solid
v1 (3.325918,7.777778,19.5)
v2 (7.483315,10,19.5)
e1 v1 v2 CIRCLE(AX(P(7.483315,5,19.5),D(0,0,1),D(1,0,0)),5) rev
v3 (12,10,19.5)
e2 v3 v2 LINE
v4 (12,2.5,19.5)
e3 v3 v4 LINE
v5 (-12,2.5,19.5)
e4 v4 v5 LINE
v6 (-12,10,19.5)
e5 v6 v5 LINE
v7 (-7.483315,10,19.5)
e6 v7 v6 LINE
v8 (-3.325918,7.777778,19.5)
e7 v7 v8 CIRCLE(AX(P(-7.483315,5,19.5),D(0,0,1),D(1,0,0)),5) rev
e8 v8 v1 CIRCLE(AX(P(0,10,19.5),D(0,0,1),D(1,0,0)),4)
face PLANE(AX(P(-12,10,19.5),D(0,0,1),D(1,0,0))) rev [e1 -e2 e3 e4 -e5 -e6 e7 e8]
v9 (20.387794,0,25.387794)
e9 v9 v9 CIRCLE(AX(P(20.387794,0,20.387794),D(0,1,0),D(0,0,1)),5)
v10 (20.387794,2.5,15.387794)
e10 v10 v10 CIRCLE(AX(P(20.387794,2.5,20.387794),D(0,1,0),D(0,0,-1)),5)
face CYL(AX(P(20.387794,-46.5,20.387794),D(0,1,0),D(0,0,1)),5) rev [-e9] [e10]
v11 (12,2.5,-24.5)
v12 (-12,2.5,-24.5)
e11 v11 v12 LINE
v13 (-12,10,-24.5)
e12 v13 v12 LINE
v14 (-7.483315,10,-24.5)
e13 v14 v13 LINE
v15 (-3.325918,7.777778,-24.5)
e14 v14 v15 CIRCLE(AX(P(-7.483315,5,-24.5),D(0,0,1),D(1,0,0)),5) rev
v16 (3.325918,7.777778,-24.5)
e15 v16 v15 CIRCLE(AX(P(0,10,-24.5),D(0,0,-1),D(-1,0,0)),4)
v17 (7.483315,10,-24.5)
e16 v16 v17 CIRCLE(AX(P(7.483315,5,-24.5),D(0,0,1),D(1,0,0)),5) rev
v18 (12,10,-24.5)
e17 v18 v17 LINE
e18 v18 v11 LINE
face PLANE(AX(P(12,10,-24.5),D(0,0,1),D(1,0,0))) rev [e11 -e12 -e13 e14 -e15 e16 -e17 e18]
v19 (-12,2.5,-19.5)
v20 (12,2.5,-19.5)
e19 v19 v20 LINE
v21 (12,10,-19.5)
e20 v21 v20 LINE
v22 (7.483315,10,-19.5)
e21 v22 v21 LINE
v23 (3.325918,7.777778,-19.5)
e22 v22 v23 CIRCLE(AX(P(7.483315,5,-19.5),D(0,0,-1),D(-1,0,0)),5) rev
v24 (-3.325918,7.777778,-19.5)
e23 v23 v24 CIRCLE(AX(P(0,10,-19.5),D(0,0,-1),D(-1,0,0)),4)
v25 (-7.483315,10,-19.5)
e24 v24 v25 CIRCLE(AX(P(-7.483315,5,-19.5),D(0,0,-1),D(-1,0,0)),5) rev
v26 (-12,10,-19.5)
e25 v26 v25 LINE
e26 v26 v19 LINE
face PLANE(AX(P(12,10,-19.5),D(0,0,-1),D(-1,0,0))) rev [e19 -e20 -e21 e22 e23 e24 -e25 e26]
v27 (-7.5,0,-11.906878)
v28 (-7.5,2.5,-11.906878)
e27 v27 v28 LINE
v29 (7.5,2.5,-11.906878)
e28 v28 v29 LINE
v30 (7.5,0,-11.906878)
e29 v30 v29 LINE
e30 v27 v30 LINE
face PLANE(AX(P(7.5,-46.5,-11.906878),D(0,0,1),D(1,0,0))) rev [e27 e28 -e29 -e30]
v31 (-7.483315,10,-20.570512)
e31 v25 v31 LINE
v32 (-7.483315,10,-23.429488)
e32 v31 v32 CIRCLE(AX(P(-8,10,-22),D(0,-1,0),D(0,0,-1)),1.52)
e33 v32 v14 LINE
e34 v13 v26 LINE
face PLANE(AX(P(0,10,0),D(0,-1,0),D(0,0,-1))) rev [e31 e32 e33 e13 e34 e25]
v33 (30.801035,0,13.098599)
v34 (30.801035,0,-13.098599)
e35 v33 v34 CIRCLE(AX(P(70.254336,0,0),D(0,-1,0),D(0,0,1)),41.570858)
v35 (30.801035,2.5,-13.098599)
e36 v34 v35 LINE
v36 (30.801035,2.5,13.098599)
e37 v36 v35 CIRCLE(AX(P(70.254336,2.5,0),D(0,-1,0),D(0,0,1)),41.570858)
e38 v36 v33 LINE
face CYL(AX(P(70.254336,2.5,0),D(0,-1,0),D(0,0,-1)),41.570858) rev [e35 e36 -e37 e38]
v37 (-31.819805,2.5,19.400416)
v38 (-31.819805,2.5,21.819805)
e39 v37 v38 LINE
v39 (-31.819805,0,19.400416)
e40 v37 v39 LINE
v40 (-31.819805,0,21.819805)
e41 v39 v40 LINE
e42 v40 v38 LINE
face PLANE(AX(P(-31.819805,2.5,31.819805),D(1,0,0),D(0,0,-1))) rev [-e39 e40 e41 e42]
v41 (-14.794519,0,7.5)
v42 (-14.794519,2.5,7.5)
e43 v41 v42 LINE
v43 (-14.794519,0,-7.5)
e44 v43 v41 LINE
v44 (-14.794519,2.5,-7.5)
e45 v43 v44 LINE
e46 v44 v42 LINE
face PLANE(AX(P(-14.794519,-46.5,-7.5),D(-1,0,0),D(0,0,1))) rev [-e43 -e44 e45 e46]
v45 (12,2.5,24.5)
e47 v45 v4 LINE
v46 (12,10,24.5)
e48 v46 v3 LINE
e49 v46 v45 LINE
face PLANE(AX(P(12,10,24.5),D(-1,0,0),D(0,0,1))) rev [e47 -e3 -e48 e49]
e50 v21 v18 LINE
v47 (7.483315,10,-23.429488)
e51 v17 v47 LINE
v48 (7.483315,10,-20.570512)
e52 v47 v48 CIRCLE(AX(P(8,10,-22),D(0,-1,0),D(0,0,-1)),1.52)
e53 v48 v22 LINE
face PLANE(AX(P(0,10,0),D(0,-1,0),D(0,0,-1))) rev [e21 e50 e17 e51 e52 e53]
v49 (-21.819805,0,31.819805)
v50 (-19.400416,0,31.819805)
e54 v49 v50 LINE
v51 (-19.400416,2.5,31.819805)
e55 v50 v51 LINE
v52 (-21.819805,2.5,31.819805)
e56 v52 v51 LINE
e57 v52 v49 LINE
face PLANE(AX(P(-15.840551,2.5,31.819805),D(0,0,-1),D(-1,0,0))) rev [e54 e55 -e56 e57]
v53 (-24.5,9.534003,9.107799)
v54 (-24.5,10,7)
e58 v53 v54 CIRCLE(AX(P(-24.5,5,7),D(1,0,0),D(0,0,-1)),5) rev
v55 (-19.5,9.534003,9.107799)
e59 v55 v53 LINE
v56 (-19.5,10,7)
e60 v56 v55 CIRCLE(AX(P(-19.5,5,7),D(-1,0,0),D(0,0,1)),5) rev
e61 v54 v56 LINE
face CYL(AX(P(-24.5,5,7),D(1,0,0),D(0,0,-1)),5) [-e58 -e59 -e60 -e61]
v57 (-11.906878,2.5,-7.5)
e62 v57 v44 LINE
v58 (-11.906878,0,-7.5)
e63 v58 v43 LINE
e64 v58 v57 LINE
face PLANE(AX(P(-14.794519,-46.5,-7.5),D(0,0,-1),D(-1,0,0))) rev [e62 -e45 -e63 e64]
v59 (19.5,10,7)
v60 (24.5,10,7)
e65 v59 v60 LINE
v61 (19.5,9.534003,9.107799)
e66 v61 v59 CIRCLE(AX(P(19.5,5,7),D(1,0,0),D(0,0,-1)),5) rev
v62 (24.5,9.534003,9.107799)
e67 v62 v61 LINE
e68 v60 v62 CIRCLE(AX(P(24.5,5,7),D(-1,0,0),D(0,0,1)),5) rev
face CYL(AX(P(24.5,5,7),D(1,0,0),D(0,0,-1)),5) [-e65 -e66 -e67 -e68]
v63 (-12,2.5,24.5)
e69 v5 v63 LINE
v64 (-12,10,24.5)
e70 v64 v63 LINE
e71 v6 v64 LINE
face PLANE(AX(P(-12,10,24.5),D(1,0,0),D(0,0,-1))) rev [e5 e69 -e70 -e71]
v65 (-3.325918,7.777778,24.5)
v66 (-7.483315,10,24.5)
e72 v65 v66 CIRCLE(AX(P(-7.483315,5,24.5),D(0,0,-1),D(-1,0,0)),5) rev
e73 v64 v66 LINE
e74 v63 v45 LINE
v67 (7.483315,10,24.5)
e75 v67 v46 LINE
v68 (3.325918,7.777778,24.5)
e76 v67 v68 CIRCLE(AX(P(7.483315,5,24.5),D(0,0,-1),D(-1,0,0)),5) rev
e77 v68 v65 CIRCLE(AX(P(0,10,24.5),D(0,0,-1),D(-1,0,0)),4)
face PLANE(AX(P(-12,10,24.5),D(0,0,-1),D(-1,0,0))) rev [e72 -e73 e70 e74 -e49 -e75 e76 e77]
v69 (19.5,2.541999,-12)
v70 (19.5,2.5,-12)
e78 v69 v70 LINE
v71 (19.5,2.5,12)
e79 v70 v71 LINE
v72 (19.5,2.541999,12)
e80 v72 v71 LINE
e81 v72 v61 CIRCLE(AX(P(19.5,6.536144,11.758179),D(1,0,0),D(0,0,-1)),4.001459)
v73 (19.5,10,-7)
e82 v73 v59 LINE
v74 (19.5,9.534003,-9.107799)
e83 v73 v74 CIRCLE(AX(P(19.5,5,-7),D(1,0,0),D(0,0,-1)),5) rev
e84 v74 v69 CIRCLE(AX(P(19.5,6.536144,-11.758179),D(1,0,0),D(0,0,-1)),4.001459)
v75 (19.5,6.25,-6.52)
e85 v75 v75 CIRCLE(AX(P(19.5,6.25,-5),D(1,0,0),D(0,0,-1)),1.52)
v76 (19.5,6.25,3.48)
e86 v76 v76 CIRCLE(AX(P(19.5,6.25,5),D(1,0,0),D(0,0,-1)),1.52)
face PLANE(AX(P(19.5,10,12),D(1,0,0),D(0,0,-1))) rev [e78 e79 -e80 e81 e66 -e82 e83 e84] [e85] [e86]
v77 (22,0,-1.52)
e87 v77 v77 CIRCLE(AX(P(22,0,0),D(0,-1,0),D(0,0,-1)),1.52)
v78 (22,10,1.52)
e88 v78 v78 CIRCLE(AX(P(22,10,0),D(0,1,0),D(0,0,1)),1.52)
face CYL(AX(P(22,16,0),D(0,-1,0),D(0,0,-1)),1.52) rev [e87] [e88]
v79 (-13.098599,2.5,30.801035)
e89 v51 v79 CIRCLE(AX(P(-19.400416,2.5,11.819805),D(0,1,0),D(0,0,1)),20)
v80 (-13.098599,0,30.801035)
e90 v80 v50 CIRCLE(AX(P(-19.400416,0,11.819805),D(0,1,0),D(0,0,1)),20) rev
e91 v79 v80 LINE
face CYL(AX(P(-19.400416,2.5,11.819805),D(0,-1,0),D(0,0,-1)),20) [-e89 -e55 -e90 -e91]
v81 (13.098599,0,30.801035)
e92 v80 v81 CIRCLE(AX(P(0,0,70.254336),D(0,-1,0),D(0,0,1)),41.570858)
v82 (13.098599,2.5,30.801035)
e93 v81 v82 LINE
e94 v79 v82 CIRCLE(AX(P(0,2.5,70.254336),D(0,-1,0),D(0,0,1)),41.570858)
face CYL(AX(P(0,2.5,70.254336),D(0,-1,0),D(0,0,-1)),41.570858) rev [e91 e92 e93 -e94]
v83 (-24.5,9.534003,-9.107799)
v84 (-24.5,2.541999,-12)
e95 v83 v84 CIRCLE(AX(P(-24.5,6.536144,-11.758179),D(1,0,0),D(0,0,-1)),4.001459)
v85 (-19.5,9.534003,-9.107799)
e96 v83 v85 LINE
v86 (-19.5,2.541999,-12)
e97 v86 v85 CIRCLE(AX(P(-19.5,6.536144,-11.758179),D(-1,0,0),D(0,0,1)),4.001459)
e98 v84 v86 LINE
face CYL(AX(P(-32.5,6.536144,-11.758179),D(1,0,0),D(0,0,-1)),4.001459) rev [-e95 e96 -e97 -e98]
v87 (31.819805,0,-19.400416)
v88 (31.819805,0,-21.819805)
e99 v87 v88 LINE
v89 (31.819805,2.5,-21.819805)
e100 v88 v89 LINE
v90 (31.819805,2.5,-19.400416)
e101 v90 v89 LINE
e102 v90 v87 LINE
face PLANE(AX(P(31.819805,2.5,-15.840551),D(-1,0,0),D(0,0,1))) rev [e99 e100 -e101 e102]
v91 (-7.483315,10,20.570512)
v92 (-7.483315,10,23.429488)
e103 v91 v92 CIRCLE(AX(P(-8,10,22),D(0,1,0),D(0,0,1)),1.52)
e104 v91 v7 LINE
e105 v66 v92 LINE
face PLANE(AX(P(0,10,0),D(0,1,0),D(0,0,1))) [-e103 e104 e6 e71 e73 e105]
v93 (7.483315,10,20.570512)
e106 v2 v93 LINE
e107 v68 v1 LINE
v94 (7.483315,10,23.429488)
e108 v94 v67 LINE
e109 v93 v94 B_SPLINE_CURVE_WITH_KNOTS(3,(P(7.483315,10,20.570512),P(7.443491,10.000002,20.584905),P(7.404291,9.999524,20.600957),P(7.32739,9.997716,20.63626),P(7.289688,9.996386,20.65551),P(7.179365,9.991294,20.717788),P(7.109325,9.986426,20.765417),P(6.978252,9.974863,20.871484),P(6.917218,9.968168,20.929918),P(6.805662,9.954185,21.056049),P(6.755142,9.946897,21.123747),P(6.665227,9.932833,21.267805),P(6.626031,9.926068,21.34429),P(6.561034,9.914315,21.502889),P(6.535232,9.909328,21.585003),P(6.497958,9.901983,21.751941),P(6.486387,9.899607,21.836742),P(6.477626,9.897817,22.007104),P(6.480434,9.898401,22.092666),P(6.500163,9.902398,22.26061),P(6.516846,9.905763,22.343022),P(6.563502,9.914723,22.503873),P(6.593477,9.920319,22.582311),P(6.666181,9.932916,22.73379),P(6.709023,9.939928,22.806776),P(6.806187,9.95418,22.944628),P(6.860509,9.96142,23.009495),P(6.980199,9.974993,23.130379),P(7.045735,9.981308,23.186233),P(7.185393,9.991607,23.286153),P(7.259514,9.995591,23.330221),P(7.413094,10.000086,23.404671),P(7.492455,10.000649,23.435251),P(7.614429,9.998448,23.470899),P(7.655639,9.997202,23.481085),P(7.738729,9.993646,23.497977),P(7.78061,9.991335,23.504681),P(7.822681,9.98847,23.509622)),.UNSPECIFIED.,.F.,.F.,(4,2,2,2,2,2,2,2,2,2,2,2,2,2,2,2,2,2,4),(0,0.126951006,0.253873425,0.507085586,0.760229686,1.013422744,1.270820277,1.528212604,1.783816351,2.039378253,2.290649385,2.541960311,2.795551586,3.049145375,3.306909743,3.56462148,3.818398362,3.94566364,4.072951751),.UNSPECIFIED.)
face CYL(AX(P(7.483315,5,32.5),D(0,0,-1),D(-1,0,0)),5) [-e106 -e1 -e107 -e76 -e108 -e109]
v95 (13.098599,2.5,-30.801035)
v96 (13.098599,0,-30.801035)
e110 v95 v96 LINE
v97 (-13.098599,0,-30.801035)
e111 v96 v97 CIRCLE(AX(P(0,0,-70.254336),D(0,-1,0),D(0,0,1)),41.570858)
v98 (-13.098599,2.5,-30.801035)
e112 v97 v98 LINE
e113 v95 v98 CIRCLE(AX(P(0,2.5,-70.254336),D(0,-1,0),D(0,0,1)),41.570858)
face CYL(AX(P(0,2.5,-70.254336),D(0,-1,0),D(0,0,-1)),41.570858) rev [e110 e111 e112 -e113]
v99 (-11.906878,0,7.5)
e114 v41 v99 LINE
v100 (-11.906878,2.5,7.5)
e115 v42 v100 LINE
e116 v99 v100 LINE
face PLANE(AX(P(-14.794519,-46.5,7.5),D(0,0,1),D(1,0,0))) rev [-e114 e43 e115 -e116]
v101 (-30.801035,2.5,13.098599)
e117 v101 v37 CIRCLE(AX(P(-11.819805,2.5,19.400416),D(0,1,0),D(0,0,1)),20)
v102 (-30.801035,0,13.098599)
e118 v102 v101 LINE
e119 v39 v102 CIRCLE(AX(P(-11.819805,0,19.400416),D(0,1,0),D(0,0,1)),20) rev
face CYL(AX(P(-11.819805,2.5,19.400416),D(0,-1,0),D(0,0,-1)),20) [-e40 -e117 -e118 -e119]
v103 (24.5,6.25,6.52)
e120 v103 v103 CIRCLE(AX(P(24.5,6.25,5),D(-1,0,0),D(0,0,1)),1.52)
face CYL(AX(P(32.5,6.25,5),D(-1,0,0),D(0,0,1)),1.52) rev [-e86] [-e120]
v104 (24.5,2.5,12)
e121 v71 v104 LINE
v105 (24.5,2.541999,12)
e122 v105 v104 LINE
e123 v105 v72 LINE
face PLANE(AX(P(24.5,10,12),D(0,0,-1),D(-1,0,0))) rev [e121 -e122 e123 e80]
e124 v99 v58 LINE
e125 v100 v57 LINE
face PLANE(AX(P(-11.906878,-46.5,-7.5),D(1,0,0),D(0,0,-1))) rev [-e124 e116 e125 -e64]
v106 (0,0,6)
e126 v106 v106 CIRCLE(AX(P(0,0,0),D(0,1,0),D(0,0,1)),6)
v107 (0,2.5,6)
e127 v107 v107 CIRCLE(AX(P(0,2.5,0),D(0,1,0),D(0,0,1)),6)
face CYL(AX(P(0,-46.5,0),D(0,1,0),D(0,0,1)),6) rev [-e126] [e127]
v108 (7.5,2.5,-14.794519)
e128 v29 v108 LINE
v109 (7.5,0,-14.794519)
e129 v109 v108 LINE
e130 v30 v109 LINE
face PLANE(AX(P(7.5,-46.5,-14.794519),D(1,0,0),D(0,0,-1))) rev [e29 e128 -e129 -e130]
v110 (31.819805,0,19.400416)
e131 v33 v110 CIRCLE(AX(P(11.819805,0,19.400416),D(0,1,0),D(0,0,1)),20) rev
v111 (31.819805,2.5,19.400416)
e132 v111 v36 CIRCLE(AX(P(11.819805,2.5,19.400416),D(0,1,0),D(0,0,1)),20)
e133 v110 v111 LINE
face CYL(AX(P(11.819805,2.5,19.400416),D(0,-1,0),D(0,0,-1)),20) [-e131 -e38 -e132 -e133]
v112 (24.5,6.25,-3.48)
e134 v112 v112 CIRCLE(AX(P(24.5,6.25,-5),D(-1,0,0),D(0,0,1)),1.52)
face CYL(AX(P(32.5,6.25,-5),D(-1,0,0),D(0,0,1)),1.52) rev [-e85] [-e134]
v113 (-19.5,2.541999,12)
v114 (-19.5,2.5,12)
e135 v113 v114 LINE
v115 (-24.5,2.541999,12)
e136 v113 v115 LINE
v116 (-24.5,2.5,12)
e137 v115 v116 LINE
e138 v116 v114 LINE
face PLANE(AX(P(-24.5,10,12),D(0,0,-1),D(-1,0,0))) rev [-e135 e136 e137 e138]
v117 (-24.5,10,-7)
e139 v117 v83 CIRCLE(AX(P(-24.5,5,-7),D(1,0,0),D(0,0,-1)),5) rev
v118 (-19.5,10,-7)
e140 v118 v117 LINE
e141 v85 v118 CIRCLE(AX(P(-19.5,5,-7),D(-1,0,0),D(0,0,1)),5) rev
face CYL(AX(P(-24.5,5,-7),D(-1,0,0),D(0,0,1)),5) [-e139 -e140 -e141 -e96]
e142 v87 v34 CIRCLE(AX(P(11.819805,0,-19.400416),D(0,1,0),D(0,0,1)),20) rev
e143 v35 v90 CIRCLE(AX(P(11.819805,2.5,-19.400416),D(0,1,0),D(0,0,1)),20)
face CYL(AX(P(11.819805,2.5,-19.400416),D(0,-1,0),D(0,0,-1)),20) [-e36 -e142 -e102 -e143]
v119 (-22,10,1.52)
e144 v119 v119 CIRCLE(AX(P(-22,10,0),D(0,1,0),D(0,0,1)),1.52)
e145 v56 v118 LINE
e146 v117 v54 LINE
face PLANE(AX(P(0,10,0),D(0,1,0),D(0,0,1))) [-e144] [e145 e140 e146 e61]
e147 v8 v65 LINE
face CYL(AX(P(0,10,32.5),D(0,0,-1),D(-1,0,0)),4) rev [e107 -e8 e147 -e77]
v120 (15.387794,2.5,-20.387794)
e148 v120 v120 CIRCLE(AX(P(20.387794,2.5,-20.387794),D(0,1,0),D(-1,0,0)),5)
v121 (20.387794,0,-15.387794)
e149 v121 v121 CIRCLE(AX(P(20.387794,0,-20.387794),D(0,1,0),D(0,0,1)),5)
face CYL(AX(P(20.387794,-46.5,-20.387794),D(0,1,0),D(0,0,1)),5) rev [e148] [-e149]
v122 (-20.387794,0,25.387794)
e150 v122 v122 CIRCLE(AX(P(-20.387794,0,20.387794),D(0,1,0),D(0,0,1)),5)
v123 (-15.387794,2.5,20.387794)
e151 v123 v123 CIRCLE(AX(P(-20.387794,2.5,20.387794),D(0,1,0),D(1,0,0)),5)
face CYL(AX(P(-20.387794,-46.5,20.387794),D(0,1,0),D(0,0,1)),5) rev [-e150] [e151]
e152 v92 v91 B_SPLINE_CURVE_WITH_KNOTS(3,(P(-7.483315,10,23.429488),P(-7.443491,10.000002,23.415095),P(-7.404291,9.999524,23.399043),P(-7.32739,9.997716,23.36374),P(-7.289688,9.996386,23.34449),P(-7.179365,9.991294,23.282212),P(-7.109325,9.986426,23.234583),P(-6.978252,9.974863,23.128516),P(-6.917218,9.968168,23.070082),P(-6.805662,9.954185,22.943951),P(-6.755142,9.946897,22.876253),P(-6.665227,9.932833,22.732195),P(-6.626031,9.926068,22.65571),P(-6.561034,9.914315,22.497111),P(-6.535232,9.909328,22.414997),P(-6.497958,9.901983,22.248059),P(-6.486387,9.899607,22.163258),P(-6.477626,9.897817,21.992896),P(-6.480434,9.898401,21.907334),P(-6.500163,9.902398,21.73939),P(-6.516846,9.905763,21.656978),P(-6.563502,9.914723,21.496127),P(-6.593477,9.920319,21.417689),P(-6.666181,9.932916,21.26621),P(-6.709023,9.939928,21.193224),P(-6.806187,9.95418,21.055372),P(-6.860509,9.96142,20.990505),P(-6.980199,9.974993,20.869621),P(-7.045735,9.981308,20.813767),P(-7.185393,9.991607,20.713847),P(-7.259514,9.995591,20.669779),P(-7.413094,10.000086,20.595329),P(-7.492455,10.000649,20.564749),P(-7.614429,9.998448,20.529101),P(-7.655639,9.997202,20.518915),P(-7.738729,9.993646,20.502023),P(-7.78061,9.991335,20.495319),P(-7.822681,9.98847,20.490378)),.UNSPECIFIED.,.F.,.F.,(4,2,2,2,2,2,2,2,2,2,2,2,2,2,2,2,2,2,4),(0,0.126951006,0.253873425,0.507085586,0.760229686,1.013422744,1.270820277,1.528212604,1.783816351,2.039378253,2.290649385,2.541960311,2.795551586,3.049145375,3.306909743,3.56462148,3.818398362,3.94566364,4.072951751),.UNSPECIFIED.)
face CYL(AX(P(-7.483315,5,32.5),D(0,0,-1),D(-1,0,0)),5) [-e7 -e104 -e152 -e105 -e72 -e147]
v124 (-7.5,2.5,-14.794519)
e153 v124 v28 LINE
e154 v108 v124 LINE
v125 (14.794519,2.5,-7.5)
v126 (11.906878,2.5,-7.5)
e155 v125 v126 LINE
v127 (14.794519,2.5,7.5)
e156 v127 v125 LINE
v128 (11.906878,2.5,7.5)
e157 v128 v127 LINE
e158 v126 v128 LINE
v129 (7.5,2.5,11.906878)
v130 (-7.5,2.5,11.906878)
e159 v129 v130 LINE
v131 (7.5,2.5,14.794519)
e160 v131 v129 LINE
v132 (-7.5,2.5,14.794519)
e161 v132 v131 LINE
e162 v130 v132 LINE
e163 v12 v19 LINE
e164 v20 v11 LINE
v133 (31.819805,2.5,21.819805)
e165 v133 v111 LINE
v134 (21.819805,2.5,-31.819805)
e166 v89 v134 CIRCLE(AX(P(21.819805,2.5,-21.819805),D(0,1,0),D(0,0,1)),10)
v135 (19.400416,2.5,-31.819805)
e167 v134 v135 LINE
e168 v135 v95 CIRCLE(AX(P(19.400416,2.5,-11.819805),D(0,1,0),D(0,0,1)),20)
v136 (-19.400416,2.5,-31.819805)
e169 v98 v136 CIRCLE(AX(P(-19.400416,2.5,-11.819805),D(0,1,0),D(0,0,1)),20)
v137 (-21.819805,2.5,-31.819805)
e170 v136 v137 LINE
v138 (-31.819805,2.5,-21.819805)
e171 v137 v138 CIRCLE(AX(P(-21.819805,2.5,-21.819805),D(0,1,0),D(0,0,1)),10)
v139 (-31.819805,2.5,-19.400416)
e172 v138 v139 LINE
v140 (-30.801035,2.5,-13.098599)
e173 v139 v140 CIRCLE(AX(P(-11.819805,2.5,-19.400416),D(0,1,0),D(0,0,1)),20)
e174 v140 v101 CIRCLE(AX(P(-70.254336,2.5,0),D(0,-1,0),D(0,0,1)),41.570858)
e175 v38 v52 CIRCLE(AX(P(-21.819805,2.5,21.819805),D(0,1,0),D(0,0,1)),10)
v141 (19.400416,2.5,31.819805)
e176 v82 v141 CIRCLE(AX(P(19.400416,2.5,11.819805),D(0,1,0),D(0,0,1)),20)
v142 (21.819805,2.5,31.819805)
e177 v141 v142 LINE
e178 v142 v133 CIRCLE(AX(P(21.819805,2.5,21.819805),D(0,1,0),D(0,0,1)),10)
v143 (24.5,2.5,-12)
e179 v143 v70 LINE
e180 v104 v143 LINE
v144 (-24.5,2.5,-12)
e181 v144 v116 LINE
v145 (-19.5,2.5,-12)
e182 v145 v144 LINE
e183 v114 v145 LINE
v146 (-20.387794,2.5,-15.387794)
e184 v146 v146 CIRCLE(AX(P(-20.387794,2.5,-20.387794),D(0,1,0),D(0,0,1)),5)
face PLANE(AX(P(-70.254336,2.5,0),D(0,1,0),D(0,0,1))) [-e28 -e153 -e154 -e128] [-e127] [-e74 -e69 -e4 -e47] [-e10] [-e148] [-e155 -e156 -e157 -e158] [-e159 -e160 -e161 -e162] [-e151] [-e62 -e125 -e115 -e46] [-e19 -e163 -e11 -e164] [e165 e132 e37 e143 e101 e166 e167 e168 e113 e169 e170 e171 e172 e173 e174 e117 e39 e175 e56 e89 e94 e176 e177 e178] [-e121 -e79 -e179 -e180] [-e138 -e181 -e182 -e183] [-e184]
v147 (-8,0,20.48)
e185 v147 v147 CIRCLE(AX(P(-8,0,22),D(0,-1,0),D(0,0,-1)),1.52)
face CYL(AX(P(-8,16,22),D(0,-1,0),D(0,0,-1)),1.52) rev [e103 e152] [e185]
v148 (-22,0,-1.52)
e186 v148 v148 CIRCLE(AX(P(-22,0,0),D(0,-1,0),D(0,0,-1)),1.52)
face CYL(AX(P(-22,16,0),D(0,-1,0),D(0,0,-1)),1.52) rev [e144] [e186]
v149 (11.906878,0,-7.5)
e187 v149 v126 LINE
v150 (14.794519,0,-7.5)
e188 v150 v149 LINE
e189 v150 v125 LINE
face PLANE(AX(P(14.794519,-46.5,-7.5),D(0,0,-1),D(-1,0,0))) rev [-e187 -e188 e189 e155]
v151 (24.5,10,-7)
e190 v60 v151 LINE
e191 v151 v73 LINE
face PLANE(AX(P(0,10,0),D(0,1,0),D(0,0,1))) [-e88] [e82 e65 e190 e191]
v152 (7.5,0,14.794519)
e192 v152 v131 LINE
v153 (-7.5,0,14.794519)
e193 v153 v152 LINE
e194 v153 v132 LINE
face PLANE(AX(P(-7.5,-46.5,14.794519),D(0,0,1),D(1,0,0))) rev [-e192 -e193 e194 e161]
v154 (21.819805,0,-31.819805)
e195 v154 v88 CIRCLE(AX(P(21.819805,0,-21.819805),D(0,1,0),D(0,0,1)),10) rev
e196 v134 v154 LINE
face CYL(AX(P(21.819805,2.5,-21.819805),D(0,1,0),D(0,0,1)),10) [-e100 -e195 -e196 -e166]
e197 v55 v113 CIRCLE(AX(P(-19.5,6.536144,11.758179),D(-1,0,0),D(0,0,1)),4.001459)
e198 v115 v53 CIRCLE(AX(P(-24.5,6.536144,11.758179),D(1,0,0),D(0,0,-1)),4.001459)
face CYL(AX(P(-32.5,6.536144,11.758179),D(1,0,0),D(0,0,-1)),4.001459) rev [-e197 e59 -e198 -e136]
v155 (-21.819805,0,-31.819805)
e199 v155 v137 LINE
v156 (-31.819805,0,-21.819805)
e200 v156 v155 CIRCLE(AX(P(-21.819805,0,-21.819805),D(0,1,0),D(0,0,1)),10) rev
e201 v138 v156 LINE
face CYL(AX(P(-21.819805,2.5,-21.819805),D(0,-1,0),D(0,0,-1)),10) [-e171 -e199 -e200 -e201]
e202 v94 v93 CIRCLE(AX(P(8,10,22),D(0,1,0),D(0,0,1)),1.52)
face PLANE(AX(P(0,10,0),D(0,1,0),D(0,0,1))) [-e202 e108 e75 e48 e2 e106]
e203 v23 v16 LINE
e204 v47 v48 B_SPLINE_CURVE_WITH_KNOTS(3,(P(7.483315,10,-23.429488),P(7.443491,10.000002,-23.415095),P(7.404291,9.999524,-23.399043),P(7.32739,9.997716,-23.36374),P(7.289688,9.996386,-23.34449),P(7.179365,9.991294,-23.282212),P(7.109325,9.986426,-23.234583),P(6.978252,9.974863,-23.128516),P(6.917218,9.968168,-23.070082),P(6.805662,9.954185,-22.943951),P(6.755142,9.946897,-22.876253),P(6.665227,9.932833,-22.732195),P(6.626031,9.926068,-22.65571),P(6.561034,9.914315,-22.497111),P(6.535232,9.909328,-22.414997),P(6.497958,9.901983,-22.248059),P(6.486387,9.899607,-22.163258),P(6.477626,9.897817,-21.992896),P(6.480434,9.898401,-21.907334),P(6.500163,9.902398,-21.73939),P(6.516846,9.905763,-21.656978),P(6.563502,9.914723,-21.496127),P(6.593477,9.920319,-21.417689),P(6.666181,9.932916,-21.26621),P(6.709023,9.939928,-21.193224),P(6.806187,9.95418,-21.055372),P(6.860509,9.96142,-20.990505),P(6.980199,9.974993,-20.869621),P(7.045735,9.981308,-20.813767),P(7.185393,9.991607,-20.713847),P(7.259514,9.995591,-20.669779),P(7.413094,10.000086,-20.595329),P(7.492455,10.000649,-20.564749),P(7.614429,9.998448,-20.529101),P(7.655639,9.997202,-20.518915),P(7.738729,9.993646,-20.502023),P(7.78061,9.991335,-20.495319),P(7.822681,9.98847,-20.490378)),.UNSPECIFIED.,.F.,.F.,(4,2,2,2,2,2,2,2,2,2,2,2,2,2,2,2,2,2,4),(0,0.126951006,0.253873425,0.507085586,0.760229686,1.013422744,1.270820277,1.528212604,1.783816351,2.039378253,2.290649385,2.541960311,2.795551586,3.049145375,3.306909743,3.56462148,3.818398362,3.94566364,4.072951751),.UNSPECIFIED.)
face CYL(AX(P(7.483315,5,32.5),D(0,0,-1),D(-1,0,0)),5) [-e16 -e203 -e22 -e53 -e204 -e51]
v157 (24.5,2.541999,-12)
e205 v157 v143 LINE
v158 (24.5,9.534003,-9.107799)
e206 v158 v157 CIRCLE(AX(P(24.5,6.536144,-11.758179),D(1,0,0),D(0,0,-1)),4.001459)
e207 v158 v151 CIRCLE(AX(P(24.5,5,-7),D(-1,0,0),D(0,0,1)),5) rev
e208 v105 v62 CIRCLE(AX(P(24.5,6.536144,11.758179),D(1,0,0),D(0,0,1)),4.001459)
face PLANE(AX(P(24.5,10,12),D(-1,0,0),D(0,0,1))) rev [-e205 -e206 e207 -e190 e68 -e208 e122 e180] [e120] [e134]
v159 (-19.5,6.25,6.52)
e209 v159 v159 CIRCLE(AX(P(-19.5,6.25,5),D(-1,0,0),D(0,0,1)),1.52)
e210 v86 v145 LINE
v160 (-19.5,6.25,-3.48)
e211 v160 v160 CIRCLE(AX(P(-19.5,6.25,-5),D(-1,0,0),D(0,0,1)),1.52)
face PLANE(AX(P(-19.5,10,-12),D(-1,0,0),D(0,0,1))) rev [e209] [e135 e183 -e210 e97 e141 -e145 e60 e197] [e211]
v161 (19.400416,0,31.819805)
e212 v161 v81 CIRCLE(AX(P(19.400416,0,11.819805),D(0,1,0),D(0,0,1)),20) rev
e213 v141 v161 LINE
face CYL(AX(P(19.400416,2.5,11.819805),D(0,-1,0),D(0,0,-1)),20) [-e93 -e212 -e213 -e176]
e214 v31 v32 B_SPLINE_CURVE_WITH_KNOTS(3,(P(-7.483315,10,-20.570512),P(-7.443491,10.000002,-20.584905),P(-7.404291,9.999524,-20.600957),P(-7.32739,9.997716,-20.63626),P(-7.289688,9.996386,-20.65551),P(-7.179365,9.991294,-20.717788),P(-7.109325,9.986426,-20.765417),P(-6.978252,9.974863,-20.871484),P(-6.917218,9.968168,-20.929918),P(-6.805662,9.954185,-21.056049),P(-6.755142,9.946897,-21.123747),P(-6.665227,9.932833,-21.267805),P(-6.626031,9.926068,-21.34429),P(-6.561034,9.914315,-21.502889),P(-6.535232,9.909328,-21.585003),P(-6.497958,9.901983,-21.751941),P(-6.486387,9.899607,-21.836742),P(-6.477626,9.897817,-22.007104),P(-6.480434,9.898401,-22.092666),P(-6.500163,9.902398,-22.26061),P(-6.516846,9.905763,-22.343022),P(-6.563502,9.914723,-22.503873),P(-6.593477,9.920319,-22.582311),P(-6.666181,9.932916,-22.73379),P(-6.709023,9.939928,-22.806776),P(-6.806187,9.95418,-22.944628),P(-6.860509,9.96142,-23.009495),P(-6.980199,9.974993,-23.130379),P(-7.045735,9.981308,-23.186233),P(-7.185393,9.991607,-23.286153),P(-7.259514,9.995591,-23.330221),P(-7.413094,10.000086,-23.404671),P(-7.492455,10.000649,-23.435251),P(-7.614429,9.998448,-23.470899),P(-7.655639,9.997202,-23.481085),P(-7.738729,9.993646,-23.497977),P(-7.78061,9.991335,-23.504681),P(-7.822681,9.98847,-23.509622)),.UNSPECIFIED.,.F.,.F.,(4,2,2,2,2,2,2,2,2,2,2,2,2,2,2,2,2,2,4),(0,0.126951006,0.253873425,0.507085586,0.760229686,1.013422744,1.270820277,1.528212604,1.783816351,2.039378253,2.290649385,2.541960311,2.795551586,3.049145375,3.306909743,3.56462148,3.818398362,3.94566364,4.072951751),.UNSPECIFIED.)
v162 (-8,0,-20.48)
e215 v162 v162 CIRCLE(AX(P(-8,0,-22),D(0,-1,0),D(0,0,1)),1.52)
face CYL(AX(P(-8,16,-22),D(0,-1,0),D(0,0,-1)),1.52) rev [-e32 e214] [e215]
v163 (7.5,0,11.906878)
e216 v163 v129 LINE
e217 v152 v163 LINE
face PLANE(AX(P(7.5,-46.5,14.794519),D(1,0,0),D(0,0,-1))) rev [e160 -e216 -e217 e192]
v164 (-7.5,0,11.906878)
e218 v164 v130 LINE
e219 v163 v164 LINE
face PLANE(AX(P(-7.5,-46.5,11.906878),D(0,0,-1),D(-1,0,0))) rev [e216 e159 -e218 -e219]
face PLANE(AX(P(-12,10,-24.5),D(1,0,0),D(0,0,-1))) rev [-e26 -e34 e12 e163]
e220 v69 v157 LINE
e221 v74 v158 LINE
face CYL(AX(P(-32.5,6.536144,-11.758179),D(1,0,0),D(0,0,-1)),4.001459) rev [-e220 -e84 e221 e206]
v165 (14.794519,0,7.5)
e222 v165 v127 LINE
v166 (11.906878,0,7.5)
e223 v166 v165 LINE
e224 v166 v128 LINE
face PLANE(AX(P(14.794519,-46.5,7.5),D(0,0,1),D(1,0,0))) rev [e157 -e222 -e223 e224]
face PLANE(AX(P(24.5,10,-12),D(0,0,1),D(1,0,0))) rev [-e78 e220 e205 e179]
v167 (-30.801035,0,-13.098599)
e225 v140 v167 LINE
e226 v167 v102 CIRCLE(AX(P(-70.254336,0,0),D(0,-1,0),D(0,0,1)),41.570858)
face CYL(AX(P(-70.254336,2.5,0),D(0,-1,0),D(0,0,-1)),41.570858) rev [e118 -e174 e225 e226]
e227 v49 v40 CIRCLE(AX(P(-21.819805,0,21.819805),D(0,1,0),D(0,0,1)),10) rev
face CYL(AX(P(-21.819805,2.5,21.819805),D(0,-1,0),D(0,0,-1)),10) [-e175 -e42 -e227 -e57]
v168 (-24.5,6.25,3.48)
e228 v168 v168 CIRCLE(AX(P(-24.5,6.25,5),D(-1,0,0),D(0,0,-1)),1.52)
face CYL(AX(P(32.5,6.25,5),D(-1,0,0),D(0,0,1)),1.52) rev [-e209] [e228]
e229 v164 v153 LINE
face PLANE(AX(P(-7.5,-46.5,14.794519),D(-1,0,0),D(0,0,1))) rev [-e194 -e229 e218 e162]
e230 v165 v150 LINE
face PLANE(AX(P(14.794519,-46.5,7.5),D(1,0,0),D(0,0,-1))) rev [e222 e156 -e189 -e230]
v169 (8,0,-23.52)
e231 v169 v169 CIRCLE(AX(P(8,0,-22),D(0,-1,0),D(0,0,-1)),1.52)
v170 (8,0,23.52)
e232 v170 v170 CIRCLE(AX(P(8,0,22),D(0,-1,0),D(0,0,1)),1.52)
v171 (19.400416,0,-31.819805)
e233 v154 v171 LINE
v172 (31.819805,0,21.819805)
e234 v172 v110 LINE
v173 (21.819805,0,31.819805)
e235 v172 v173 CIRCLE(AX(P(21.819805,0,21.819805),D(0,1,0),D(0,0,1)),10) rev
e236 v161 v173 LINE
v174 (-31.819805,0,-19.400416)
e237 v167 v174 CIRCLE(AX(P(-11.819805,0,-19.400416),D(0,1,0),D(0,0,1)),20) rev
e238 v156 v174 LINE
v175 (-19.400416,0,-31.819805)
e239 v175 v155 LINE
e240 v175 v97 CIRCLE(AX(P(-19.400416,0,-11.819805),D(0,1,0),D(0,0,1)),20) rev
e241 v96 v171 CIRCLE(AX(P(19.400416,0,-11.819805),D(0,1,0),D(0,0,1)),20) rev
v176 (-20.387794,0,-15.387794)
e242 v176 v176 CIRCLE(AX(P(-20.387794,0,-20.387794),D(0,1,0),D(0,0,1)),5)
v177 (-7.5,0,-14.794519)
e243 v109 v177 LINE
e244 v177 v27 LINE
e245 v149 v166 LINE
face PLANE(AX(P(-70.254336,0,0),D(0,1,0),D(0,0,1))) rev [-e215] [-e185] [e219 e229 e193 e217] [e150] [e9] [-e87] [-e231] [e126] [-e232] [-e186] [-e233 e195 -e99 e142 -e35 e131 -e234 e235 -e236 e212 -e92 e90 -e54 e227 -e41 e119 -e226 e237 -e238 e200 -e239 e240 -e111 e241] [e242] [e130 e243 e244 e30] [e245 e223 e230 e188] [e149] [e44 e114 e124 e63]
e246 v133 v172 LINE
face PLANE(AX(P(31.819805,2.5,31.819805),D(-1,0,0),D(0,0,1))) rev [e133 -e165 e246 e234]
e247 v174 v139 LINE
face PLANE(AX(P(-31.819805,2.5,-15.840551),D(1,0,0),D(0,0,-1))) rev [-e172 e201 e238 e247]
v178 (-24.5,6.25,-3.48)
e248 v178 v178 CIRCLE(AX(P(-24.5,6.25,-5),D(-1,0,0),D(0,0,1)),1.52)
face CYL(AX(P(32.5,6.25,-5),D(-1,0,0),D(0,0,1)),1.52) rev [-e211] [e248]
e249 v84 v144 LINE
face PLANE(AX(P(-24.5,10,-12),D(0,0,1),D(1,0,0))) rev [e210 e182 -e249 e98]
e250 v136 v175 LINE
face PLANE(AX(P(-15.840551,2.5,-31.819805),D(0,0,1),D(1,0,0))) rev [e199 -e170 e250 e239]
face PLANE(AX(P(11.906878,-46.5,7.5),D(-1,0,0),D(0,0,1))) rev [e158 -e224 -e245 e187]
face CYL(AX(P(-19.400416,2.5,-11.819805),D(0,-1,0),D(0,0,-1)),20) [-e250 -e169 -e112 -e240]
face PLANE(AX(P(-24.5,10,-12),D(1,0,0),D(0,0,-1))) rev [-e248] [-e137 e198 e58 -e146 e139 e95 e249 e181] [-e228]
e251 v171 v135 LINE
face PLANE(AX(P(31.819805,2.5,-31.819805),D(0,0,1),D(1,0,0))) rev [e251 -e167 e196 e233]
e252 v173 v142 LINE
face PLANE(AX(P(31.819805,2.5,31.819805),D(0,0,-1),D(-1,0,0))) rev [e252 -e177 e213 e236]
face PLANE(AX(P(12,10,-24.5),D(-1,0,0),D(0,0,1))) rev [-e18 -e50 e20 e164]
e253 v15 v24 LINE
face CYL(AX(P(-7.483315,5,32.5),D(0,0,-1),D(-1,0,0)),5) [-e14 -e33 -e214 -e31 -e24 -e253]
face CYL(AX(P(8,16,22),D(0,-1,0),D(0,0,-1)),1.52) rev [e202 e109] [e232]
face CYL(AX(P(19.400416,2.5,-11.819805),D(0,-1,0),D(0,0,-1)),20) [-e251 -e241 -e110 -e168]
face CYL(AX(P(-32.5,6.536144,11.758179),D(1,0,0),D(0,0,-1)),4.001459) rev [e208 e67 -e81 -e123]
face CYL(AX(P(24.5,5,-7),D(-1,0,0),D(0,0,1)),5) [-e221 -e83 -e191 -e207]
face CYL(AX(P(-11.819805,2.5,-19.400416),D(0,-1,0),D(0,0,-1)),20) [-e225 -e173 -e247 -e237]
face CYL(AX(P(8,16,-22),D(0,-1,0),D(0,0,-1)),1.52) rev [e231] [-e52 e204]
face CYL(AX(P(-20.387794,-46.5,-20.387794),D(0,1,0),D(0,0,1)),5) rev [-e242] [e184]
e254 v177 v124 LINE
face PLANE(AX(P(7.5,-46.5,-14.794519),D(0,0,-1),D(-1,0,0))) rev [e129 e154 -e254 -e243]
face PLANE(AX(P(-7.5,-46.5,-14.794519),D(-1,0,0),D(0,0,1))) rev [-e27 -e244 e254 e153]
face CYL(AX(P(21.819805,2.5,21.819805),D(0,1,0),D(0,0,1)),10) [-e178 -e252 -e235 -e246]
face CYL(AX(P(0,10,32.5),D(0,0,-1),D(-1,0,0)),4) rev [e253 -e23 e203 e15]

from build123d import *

# Parameters (mm, degrees)
EXTRUDE_1_DEPTH          = 2.5
FILLET_1_R               = 10
FILLET_2_R               = 10
FILLET_3_R               = 10
FILLET_4_R               = 10
SKETCH_2_R               = 5
SKETCH_2_R_2             = 1.52
SKETCH_2_W               = 15
SKETCH_2_H               = 2.887641603
CUT_EXTRUDE_1_DEPTH      = 49
FILLET_5_R               = 20
FILLET_6_R               = 20
PATTERN_CIRCULAR_2_COUNT = 4
SKETCH_3_R               = 6
CUT_EXTRUDE_2_DEPTH      = 49
FILLET_7_R               = 20
FILLET_8_R               = 20
FILLET_9_R               = 20
FILLET_10_R              = 20
FILLET_11_R              = 20
FILLET_12_R              = 20
SKETCH_6_W               = 24
SKETCH_6_H               = 5
SKETCH_6_W_2             = 5
SKETCH_6_H_2             = 24
EXTRUDE_2_DEPTH          = 7.5
SKETCH_7_R               = 1.52
CUT_EXTRUDE_4_DEPTH      = 16
SKETCH_8_R               = 4
CUT_EXTRUDE_5_DEPTH      = 57
FILLET_13_R              = 5
FILLET_14_R              = 5
FILLET_15_R              = 5
FILLET_16_R              = 5
FILLET_17_R              = 5
FILLET_18_R              = 5
FILLET_19_R              = 5
FILLET_20_R              = 5
SKETCH_9_R               = 4.001458819
CUT_EXTRUDE_6_DEPTH      = 57
SKETCH_10_R              = 1.52
CUT_EXTRUDE_7_DEPTH      = 57


with BuildPart() as part:
    # 草图1 → 凸台-拉伸1 (new body)
    with BuildSketch(Plane(origin=(0, 0, 0), x_dir=(1, 0, 0), z_dir=(0, 1, 0))):
        with BuildLine():
            Line((31.819805153, -31.819805153), (15.840551385, -31.819805153))
            ThreePointArc((15.840551385, -31.819805153), (0, -28.683478044), (-15.840551385, -31.819805153))
            Line((-15.840551385, -31.819805153), (-31.819805153, -31.819805153))
            Line((-31.819805153, -31.819805153), (-31.819805153, -15.840551385))
            ThreePointArc((-31.819805153, -15.840551385), (-28.683478044, 0), (-31.819805153, 15.840551385))
            Line((-31.819805153, 15.840551385), (-31.819805153, 31.819805153))
            Line((-31.819805153, 31.819805153), (-15.840551385, 31.819805153))
            ThreePointArc((-15.840551385, 31.819805153), (0, 28.683478044), (15.840551385, 31.819805153))
            Line((15.840551385, 31.819805153), (31.819805153, 31.819805153))
            Line((31.819805153, 31.819805153), (31.819805153, 15.840551385))
            ThreePointArc((31.819805153, 15.840551385), (28.683478044, 0), (31.819805153, -15.840551385))
            Line((31.819805153, -15.840551385), (31.819805153, -31.819805153))
        make_face()
    extrude(amount=EXTRUDE_1_DEPTH)

    # 圆角1
    fillet_1_edges = [part.edges().sort_by_distance(p)[0] for p in [
        (31.819805153, 1.25, 31.819805153),
    ]]
    fillet(fillet_1_edges, radius=FILLET_1_R)

    # 圆角2
    fillet_2_edges = [part.edges().sort_by_distance(p)[0] for p in [
        (31.819805153, 1.25, -31.819805153),
    ]]
    fillet(fillet_2_edges, radius=FILLET_2_R)

    # 圆角3
    fillet_3_edges = [part.edges().sort_by_distance(p)[0] for p in [
        (-31.819805153, 1.25, -31.819805153),
    ]]
    fillet(fillet_3_edges, radius=FILLET_3_R)

    # 圆角4
    fillet_4_edges = [part.edges().sort_by_distance(p)[0] for p in [
        (-31.819805153, 1.25, 31.819805153),
    ]]
    fillet(fillet_4_edges, radius=FILLET_4_R)

    # 草图2 → 切除-拉伸1 (cut)
    with BuildSketch(Plane(origin=(0, 2.5, 0), x_dir=(1, 0, 0), z_dir=(0, 1, 0))):
        with Locations(Location((-20.387793681, 20.387793681, 0), (0, 0, 270))):
            Circle(SKETCH_2_R)
        with Locations((-46.88466688, 53.955734692)):
            Circle(SKETCH_2_R_2)
        with Locations((-53.955734692, 46.88466688)):
            Circle(SKETCH_2_R_2)
        with Locations((0, 13.350698667)):
            Rectangle(SKETCH_2_W, SKETCH_2_H)
    cut_extrude_1 = extrude(amount=-CUT_EXTRUDE_1_DEPTH, mode=Mode.SUBTRACT)

    # 圆角5
    fillet_5_edges = [part.edges().sort_by_distance(p)[0] for p in [
        (-15.840551385, 1.25, -31.819805153),
    ]]
    fillet(fillet_5_edges, radius=FILLET_5_R)

    # 圆角6
    fillet_6_edges = [part.edges().sort_by_distance(p)[0] for p in [
        (-31.819805153, 1.25, -15.840551385),
    ]]
    fillet(fillet_6_edges, radius=FILLET_6_R)

    # 阵列(圆周)2: 切除-拉伸1 ×4 about axis
    pattern_circular_2_axis = Axis((0, 0, 0), (0, 1, 0))
    for i in range(1, PATTERN_CIRCULAR_2_COUNT):
        add(cut_extrude_1.rotate(pattern_circular_2_axis, i * 360 / PATTERN_CIRCULAR_2_COUNT), mode=Mode.SUBTRACT)

    # 草图3 → 切除-拉伸2 (cut)
    with BuildSketch(Plane(origin=(0, 2.5, 0), x_dir=(1, 0, 0), z_dir=(0, 1, 0))):
        with Locations(Location((0, 0, 0), (0, 0, 270))):
            Circle(SKETCH_3_R)
    extrude(amount=-CUT_EXTRUDE_2_DEPTH, mode=Mode.SUBTRACT)

    # 圆角7
    fillet_7_edges = [part.edges().sort_by_distance(p)[0] for p in [
        (31.819805153, 1.25, 15.840551385),
    ]]
    fillet(fillet_7_edges, radius=FILLET_7_R)

    # 圆角8
    fillet_8_edges = [part.edges().sort_by_distance(p)[0] for p in [
        (15.840551385, 1.25, 31.819805153),
    ]]
    fillet(fillet_8_edges, radius=FILLET_8_R)

    # 圆角9
    fillet_9_edges = [part.edges().sort_by_distance(p)[0] for p in [
        (-31.819805153, 1.25, 15.840551385),
    ]]
    fillet(fillet_9_edges, radius=FILLET_9_R)

    # 圆角10
    fillet_10_edges = [part.edges().sort_by_distance(p)[0] for p in [
        (-15.840551385, 1.25, 31.819805153),
    ]]
    fillet(fillet_10_edges, radius=FILLET_10_R)

    # 圆角11
    fillet_11_edges = [part.edges().sort_by_distance(p)[0] for p in [
        (15.840551385, 1.25, -31.819805153),
    ]]
    fillet(fillet_11_edges, radius=FILLET_11_R)

    # 圆角12
    fillet_12_edges = [part.edges().sort_by_distance(p)[0] for p in [
        (31.819805153, 1.25, -15.840551385),
    ]]
    fillet(fillet_12_edges, radius=FILLET_12_R)

    # 草图6 → 凸台-拉伸2 (add)
    with BuildSketch(Plane(origin=(0, 2.5, 0), x_dir=(1, 0, 0), z_dir=(0, 1, 0))):
        with Locations((0, 22)):
            Rectangle(SKETCH_6_W, SKETCH_6_H)
        with Locations((22, 0)):
            Rectangle(SKETCH_6_W_2, SKETCH_6_H_2)
        with Locations((0, -22)):
            Rectangle(SKETCH_6_W, SKETCH_6_H)
        with Locations((-22, 0)):
            Rectangle(SKETCH_6_W_2, SKETCH_6_H_2)
    extrude(amount=EXTRUDE_2_DEPTH)

    # 草图7 → 切除-拉伸4 (cut)
    with BuildSketch(Plane.XZ):
        with Locations(Location((-22, 0, 0), (0, 0, 270))):
            Circle(SKETCH_7_R)
        with Locations(Location((22, 0, 0), (0, 0, 270))):
            Circle(SKETCH_7_R)
        with Locations(Location((-8, 22, 0), (0, 0, 270))):
            Circle(SKETCH_7_R)
        with Locations(Location((8, 22, 0), (0, 0, 90))):
            Circle(SKETCH_7_R)
        with Locations(Location((-8, -22, 0), (0, 0, 270))):
            Circle(SKETCH_7_R)
        with Locations(Location((8, -22, 0), (0, 0, 270))):
            Circle(SKETCH_7_R)
    extrude(amount=-CUT_EXTRUDE_4_DEPTH, mode=Mode.SUBTRACT)

    # 草图8 → 切除-拉伸5 (cut)
    with BuildSketch(Plane(origin=(0, 0, -24.5), x_dir=(-1, 0, 0), z_dir=(0, 0, -1))):
        with Locations((0, 10)):
            Circle(SKETCH_8_R)
    extrude(amount=-CUT_EXTRUDE_5_DEPTH, mode=Mode.SUBTRACT)

    # 圆角13
    # the kernel refuses this fillet: 5 mm, written as the material it takes off along each edge
    with BuildSketch(Plane(origin=(-4, 10, 10.791713066), x_dir=(-1, 0, 0), z_dir=(0, 0, 1))) as fillet_13_piece_1:
        with BuildLine():
            CenterArc((3.483314774, 5), FILLET_13_R, 213.748988596, 56.251011404)
            ThreePointArc((-0.674082323, 2.222222222), (-0.172228409, 1.161104925), (0, 0))
            Line((0, 0), (3.483314774, 0))
        make_face()
    extrude(amount=22.416573868, mode=Mode.SUBTRACT)

    # 圆角14
    # the kernel refuses this fillet: 5 mm, written as the material it takes off along each edge
    with BuildSketch(Plane(origin=(4, 10, 33.208286934), x_dir=(1, 0, 0), z_dir=(0, 0, -1))) as fillet_14_piece_1:
        with BuildLine():
            CenterArc((3.483314774, 5), FILLET_14_R, 213.748988596, 56.251011404)
            ThreePointArc((-0.674082323, 2.222222222), (-0.172228409, 1.161104925), (0, 0))
            Line((0, 0), (3.483314774, 0))
        make_face()
    extrude(amount=22.416573868, mode=Mode.SUBTRACT)

    # 圆角15
    # the kernel refuses this fillet: 5 mm, written as the material it takes off along each edge
    with BuildSketch(Plane(origin=(-4, 10, -33.208286934), x_dir=(-1, 0, 0), z_dir=(0, 0, 1))) as fillet_15_piece_1:
        with BuildLine():
            CenterArc((3.483314774, 5), FILLET_15_R, 213.748988596, 56.251011404)
            ThreePointArc((-0.674082323, 2.222222222), (-0.172228409, 1.161104925), (0, 0))
            Line((0, 0), (3.483314774, 0))
        make_face()
    extrude(amount=22.416573868, mode=Mode.SUBTRACT)

    # 圆角16
    # the kernel refuses this fillet: 5 mm, written as the material it takes off along each edge
    with BuildSketch(Plane(origin=(4, 10, -10.791713066), x_dir=(1, 0, 0), z_dir=(0, 0, -1))) as fillet_16_piece_1:
        with BuildLine():
            CenterArc((3.483314774, 5), FILLET_16_R, 213.748988596, 56.251011404)
            ThreePointArc((-0.674082323, 2.222222222), (-0.172228409, 1.161104925), (0, 0))
            Line((0, 0), (3.483314774, 0))
        make_face()
    extrude(amount=22.416573868, mode=Mode.SUBTRACT)

    # 圆角17
    fillet_17_edges = [part.edges().sort_by_distance(p)[0] for p in [
        (-22, 10, -12),
    ]]
    fillet(fillet_17_edges, radius=FILLET_17_R)

    # 圆角18
    fillet_18_edges = [part.edges().sort_by_distance(p)[0] for p in [
        (-22, 10, 12),
    ]]
    fillet(fillet_18_edges, radius=FILLET_18_R)

    # 圆角19
    fillet_19_edges = [part.edges().sort_by_distance(p)[0] for p in [
        (22, 10, 12),
    ]]
    fillet(fillet_19_edges, radius=FILLET_19_R)

    # 圆角20
    fillet_20_edges = [part.edges().sort_by_distance(p)[0] for p in [
        (22, 10, -12),
    ]]
    fillet(fillet_20_edges, radius=FILLET_20_R)

    # 草图9 → 切除-拉伸6 (cut)
    with BuildSketch(Plane(origin=(24.5, 0, 0), x_dir=(0, 0, -1), z_dir=(1, 0, 0))):
        with Locations((11.758178517, 6.536143614)):
            Circle(SKETCH_9_R)
        with Locations((-11.758178517, 6.536143614)):
            Circle(SKETCH_9_R)
    extrude(amount=-CUT_EXTRUDE_6_DEPTH, mode=Mode.SUBTRACT)

    # 草图10 → 切除-拉伸7 (cut)
    with BuildSketch(Plane.ZY.offset(24.5)):
        with Locations((-5, 6.25)):
            Circle(SKETCH_10_R)
        with Locations((5, 6.25)):
            Circle(SKETCH_10_R)
    extrude(amount=-CUT_EXTRUDE_7_DEPTH, mode=Mode.SUBTRACT)


solid = part.part
